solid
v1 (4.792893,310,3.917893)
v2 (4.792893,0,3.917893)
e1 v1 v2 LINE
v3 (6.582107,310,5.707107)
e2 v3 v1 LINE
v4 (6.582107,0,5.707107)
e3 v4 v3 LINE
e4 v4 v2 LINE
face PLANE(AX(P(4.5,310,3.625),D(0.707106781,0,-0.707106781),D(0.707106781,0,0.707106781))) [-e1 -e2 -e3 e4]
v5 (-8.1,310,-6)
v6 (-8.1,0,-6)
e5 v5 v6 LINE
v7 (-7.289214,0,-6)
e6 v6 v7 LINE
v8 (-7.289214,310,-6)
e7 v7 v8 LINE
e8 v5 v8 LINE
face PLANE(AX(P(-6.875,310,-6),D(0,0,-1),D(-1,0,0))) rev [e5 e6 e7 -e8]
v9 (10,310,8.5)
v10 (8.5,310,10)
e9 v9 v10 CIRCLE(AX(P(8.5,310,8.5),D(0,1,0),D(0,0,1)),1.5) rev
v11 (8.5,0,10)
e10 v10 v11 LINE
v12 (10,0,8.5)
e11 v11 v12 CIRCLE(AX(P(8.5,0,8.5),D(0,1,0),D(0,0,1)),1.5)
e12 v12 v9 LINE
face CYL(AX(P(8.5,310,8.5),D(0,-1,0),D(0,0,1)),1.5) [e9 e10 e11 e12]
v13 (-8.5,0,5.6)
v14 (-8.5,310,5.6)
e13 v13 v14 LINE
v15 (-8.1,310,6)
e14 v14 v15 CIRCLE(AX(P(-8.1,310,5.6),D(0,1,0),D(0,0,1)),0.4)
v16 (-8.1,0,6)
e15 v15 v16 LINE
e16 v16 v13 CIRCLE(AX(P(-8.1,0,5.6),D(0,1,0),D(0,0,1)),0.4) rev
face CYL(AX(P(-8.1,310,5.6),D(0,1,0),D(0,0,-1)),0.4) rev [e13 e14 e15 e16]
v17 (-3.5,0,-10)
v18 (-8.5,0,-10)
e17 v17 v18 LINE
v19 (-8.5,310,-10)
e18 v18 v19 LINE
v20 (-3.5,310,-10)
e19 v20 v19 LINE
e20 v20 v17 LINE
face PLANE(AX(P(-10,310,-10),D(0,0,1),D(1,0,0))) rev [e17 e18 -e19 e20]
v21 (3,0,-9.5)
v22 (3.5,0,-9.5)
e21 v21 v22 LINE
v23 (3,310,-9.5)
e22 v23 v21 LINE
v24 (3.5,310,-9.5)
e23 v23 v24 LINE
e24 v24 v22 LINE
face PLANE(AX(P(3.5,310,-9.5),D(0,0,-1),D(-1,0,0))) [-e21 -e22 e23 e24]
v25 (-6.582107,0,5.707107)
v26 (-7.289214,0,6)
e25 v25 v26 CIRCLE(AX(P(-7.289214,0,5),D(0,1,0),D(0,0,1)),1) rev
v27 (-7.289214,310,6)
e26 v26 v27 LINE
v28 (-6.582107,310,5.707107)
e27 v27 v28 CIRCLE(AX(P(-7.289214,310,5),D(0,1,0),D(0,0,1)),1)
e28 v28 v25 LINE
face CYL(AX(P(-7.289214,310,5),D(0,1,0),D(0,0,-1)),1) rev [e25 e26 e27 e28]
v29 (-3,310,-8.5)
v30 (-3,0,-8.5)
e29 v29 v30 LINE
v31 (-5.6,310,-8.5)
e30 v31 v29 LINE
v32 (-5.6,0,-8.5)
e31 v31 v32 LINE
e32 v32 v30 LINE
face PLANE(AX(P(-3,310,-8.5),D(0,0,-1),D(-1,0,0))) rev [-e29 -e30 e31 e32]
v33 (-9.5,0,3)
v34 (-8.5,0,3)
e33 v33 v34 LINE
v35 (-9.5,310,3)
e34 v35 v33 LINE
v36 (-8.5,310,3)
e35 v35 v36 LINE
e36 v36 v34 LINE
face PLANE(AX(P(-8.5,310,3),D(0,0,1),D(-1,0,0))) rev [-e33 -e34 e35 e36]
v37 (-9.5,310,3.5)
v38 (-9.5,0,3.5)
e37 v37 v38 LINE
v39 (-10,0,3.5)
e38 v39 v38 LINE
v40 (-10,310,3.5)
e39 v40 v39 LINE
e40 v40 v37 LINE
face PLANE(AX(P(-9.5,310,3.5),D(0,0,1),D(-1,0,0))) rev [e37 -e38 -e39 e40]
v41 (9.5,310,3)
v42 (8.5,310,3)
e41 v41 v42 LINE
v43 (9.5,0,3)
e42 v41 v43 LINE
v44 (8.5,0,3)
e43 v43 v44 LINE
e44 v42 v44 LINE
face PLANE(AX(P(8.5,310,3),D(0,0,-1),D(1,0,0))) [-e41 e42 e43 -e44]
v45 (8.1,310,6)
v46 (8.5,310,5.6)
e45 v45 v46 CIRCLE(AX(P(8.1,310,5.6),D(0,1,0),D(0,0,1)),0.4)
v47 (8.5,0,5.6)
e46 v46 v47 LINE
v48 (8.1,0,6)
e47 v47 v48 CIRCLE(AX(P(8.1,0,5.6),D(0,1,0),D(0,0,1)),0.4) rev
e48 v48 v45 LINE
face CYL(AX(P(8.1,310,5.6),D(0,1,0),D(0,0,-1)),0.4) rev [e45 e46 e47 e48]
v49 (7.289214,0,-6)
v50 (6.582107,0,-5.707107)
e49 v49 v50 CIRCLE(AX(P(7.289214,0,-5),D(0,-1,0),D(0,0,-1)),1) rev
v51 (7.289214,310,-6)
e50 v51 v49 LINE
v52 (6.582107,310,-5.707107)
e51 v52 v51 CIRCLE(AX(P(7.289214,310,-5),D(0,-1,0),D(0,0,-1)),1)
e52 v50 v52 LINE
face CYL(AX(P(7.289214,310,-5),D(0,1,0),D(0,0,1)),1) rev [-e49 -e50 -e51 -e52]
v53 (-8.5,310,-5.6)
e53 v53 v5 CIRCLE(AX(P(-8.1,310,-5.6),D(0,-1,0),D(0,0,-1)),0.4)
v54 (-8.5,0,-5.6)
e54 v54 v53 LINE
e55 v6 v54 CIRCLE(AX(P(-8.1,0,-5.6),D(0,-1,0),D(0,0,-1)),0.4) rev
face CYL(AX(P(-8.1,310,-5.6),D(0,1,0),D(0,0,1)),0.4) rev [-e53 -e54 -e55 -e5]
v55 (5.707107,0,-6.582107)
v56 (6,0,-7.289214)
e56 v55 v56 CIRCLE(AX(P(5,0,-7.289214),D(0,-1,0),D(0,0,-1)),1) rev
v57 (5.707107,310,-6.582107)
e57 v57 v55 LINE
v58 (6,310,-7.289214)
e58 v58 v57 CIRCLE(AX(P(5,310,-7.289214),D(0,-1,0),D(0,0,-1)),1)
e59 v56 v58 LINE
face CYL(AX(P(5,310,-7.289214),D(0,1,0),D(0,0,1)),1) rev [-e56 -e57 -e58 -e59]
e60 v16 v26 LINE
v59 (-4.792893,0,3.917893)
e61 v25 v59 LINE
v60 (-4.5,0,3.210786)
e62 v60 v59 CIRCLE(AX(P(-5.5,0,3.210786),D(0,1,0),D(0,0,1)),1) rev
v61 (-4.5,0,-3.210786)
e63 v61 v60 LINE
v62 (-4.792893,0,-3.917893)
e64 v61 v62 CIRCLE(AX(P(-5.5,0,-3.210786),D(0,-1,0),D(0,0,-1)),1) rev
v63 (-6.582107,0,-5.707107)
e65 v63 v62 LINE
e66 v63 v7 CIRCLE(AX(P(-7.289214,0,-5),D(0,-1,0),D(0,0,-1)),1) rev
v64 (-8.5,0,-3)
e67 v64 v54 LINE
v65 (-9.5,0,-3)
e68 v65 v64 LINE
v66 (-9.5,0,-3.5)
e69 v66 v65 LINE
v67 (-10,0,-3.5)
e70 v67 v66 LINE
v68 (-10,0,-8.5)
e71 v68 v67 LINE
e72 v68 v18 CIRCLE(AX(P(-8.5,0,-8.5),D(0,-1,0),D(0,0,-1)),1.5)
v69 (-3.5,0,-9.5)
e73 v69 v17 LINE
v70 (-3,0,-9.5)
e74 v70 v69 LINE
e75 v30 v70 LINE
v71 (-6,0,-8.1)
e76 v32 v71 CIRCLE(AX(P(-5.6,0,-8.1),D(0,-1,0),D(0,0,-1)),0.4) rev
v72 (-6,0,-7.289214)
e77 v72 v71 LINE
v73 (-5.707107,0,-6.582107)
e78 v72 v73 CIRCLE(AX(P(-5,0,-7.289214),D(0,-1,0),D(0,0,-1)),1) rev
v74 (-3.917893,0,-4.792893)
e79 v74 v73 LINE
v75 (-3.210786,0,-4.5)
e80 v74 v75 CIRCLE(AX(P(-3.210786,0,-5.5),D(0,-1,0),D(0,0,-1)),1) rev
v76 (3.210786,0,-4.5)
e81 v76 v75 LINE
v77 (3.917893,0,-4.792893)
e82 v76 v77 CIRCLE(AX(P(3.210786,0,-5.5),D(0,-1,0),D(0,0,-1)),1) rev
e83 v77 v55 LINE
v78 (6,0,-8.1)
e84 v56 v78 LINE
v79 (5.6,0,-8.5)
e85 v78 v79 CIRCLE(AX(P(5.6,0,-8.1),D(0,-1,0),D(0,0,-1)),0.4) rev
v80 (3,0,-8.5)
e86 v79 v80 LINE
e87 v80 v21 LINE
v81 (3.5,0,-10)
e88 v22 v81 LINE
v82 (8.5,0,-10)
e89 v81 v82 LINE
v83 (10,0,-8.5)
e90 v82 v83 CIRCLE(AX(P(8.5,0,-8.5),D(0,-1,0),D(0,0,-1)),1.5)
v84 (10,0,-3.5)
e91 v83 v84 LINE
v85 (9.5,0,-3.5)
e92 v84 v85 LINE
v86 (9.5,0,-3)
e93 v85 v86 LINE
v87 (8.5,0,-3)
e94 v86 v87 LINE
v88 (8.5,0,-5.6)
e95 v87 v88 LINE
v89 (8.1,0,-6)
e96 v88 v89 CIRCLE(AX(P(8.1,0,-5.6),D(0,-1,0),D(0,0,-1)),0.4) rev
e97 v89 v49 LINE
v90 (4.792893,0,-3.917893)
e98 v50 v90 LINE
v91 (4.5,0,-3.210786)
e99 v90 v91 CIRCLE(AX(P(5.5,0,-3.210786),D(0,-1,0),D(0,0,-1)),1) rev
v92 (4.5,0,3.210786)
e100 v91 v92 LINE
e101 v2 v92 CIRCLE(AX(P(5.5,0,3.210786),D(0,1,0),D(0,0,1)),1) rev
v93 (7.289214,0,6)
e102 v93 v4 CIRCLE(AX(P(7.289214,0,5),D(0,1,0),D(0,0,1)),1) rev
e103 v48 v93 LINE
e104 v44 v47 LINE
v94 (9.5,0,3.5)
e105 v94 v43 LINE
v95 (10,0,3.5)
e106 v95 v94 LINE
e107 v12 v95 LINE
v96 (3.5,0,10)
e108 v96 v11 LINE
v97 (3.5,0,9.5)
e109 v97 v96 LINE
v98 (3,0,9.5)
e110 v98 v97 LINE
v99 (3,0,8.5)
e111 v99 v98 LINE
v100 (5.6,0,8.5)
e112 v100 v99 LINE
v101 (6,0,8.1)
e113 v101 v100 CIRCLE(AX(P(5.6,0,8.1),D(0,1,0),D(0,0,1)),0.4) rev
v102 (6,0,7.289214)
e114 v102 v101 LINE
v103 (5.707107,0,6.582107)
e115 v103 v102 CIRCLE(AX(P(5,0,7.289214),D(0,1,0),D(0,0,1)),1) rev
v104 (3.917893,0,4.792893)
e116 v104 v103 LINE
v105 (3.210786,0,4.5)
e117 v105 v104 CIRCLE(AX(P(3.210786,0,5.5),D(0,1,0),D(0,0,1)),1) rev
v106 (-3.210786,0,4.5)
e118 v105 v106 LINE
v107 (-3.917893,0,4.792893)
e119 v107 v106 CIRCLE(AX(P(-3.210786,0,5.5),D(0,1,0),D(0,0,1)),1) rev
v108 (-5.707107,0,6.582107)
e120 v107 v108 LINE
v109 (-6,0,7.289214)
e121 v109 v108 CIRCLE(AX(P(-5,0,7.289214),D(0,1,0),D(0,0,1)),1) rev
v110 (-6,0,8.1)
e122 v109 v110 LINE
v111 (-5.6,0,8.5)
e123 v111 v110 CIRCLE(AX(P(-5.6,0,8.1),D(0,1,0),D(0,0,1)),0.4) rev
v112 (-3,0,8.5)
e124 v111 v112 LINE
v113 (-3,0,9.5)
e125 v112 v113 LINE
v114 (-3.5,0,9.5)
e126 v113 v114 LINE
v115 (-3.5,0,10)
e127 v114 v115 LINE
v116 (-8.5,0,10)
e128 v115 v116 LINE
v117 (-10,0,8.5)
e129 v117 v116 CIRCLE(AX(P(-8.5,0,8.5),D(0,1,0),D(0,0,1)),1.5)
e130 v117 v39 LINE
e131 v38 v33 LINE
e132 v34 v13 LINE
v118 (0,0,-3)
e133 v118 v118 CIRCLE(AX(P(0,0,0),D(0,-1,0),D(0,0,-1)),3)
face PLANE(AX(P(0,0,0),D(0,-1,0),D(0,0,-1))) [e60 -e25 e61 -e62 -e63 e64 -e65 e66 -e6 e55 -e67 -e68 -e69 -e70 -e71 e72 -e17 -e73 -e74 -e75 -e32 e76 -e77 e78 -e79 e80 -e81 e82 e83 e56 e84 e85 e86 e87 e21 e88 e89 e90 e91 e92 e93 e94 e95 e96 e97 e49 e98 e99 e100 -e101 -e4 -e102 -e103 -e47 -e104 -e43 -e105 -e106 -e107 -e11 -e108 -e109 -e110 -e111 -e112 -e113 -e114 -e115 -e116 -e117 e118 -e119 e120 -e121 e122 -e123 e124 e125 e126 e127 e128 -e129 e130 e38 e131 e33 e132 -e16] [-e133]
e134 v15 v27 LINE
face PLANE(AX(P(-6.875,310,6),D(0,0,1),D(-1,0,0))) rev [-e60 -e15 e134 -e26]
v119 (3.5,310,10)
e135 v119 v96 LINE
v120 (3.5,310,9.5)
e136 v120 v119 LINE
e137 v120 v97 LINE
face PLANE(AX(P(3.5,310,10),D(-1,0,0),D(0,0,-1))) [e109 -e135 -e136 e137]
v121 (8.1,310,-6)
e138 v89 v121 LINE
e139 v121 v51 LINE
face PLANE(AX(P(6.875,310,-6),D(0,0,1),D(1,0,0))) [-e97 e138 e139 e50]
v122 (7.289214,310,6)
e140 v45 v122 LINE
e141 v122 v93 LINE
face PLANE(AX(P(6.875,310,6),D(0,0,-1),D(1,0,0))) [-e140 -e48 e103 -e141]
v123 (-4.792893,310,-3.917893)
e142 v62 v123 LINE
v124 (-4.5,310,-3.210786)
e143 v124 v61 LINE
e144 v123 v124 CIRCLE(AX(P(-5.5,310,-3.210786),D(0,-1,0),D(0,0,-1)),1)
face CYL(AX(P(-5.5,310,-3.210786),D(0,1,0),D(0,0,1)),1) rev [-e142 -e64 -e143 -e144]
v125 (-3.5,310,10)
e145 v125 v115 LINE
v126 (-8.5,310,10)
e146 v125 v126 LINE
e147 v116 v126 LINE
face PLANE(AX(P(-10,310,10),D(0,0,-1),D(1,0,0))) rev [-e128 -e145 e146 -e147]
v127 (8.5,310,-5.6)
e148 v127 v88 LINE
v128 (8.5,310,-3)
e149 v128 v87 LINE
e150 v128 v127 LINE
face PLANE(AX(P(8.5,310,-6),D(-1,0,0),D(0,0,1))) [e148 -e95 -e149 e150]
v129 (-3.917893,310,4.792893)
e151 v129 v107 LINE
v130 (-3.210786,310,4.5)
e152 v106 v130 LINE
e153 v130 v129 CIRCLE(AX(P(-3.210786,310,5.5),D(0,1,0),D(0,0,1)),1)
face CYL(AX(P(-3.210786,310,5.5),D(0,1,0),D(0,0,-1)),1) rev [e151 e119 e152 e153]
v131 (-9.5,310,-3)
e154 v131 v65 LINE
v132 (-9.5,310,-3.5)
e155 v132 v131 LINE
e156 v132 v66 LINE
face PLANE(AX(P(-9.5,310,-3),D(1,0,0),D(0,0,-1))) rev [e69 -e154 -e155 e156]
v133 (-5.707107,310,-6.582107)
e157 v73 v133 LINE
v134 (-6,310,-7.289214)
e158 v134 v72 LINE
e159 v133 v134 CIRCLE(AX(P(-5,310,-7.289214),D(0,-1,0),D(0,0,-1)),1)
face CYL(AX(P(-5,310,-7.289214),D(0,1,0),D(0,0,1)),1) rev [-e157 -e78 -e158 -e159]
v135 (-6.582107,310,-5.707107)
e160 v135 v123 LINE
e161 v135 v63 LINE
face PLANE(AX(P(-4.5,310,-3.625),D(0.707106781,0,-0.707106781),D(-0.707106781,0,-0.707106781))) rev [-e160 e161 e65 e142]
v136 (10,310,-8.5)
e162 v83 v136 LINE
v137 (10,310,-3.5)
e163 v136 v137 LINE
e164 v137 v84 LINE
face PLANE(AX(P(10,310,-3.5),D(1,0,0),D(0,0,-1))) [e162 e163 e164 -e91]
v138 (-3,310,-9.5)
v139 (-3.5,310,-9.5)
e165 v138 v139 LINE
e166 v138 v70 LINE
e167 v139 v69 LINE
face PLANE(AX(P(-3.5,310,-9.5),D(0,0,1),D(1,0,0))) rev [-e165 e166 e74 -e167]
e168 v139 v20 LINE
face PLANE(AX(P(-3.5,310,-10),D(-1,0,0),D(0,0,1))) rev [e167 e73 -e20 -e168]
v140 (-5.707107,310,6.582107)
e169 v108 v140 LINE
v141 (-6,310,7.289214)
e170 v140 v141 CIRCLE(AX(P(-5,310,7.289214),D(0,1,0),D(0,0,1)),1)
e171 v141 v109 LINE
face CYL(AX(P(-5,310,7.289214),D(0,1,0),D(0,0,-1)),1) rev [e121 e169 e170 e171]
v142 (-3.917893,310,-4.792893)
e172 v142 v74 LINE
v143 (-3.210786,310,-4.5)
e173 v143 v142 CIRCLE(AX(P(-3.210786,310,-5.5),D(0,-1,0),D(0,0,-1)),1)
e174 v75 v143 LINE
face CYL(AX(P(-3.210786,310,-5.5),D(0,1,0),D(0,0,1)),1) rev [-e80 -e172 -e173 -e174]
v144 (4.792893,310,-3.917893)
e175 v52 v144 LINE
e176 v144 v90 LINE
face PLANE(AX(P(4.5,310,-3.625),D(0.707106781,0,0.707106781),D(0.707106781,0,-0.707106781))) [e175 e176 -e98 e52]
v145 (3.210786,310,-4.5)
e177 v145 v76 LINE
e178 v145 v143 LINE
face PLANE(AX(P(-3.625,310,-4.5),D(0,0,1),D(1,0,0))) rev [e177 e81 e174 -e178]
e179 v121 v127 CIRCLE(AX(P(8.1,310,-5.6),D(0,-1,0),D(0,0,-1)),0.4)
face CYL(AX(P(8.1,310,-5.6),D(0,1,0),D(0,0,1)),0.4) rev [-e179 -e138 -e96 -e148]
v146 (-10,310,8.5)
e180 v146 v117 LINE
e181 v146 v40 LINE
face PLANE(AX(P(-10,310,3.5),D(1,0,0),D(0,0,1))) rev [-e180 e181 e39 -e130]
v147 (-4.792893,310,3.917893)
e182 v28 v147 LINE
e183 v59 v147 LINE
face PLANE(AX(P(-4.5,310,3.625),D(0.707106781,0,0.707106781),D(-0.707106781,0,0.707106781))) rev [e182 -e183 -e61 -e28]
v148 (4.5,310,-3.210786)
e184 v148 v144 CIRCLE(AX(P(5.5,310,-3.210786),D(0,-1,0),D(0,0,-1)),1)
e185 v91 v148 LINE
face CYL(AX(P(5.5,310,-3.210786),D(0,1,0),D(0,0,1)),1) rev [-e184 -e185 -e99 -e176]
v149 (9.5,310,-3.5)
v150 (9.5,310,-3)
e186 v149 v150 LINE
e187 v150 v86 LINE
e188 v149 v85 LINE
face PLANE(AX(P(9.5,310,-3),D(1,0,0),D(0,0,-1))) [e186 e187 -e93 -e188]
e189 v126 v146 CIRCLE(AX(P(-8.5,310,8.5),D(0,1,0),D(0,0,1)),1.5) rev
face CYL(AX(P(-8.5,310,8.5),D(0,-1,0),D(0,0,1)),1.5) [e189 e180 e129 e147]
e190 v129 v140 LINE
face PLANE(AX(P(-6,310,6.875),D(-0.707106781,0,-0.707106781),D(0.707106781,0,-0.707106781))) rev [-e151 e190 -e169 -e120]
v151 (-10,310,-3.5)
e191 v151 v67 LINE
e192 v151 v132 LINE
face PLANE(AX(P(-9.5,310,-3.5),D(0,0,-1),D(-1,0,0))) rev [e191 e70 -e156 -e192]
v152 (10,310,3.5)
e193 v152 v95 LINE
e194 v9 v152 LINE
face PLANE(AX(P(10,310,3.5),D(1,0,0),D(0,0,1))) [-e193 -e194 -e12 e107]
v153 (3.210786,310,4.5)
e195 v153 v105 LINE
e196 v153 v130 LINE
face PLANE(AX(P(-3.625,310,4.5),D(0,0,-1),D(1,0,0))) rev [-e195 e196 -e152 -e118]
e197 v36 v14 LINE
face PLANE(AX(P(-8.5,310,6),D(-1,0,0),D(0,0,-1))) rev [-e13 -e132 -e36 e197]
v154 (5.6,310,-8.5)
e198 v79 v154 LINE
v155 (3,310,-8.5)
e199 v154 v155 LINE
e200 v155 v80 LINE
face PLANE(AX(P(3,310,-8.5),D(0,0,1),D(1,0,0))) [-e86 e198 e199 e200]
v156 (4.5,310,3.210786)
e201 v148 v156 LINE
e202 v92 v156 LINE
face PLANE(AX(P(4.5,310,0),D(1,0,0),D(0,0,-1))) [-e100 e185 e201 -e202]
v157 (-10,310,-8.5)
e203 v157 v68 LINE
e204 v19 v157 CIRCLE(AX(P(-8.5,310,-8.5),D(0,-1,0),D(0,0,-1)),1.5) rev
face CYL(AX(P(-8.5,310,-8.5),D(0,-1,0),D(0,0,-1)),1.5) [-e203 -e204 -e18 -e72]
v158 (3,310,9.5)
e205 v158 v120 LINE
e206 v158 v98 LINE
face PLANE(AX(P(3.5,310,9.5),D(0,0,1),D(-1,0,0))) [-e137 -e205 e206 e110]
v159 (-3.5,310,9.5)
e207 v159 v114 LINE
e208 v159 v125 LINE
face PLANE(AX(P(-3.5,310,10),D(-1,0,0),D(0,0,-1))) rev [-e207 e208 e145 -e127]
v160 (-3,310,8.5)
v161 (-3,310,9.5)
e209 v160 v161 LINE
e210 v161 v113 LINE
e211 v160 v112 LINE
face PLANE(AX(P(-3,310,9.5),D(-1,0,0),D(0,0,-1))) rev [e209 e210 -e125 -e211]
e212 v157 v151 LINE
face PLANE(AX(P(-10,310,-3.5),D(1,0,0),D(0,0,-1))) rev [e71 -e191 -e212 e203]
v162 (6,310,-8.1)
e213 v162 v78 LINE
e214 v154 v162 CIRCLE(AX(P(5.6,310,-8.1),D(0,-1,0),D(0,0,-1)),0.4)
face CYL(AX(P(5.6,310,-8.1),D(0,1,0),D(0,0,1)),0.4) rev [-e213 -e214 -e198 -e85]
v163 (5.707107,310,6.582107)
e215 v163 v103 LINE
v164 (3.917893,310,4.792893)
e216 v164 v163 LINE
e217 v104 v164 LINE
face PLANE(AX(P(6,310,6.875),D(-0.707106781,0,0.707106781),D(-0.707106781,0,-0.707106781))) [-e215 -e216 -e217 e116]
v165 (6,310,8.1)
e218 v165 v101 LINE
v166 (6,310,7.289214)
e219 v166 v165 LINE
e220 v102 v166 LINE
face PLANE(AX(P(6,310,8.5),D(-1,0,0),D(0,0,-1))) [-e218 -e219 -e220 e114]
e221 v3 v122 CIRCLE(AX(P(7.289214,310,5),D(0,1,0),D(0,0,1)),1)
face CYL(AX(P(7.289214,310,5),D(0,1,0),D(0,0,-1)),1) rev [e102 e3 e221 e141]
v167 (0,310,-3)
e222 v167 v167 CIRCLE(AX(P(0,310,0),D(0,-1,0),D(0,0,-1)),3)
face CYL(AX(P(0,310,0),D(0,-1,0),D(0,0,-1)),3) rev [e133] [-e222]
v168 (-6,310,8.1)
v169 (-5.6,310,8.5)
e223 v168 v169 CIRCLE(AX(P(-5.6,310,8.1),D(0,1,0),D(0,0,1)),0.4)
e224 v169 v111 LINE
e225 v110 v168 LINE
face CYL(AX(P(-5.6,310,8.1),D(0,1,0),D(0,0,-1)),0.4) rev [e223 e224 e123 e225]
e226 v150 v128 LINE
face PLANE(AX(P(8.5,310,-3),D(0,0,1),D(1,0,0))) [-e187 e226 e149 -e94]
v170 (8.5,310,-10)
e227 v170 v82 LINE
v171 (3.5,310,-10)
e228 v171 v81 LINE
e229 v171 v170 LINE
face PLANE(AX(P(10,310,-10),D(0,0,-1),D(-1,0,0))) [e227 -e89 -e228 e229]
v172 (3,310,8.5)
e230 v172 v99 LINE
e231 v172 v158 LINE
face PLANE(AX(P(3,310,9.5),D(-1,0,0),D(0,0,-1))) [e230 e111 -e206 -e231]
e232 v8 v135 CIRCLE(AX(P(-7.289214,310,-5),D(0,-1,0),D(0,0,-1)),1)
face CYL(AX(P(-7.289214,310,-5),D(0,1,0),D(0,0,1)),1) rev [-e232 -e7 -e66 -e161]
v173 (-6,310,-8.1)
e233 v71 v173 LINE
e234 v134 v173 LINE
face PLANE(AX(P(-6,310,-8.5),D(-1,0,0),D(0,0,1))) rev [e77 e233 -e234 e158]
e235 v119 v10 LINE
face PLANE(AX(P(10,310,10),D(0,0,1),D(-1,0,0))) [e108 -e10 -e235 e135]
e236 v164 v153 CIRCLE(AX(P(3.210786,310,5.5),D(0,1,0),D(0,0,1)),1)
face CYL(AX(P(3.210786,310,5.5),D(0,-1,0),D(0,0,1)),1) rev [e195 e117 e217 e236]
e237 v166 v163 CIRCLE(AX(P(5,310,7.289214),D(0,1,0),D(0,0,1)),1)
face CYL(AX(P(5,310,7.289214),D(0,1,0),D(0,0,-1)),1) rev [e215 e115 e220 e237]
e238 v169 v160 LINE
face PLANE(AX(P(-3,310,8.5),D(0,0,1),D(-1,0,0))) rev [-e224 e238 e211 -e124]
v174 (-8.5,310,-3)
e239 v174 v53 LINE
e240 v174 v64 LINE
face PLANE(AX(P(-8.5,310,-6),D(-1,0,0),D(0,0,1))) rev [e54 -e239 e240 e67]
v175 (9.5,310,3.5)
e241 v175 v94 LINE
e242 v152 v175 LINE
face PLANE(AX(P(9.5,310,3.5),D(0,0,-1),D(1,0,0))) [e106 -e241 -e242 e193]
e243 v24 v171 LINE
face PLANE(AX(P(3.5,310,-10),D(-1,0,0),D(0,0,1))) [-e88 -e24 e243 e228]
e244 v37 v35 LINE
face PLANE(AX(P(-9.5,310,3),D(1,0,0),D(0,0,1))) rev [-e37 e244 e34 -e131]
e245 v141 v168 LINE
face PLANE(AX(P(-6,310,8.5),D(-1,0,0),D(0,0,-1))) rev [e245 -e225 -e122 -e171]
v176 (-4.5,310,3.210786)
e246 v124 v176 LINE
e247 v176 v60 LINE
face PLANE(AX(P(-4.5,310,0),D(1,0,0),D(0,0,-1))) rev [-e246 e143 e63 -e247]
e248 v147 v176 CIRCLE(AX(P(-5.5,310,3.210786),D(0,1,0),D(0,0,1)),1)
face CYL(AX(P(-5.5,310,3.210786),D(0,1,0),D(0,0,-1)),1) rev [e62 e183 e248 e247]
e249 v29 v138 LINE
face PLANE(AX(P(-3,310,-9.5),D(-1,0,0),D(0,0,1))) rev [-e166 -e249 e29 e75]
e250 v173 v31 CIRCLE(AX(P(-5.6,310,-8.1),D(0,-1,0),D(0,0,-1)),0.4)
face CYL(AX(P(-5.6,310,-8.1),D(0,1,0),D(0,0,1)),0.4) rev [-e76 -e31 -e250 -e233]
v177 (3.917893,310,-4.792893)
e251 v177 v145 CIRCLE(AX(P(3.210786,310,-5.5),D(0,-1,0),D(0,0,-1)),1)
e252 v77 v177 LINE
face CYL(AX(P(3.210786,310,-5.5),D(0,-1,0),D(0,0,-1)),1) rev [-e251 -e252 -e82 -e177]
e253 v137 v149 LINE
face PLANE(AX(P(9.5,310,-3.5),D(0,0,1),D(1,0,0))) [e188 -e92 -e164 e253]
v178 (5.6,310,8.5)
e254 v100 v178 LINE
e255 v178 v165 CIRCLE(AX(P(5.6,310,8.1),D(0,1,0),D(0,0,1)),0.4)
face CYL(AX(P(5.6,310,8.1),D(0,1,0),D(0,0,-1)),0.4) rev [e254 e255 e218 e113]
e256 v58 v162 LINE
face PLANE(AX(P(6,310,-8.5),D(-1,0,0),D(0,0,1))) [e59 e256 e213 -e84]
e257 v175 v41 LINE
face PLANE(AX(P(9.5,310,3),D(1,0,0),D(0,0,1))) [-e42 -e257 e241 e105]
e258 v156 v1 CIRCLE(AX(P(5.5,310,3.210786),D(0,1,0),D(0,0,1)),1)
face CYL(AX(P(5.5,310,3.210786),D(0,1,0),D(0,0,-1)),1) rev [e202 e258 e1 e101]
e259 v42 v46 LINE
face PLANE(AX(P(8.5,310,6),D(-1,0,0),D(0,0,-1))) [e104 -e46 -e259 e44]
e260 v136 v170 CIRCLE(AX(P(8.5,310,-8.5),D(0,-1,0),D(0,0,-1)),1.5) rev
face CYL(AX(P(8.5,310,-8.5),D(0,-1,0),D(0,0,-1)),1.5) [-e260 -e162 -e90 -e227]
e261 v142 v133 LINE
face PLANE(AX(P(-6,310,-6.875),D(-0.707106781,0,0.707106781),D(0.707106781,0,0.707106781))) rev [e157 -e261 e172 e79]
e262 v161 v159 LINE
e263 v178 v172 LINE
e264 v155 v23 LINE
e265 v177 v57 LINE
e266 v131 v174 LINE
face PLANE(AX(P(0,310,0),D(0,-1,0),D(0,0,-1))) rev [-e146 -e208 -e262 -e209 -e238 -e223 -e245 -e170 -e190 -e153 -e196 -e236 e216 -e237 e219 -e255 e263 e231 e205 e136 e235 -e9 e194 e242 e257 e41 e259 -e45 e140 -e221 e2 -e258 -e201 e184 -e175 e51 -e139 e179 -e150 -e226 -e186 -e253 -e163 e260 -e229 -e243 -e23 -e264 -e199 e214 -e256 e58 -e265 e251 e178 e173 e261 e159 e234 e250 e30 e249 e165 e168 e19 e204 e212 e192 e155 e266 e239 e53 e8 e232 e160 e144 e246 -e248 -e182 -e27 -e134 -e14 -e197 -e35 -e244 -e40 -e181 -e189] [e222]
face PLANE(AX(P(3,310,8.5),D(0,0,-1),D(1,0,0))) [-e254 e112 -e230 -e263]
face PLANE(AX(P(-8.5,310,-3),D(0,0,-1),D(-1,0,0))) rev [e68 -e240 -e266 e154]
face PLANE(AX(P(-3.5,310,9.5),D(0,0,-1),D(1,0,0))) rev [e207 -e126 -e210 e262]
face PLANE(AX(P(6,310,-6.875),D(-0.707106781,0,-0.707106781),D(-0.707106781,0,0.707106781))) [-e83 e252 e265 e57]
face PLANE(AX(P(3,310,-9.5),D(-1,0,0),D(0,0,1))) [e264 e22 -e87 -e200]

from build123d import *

# Parameters (mm, degrees)
BOSS_EXTRU_1_CORPS_DEPTH    = 310
CONG_1_R                    = 1.5
CONG_2_R                    = 0.4
CONG_4_R                    = 1
CONG_1_OF_SYM_TRIE_BRAS_R   = 1.5
CONG_2_OF_SYM_TRIE_BRAS_R   = 0.4
CONG_4_OF_SYM_TRIE_BRAS_R   = 1
SYM_TRIE_BRAS_DOUBLE_DEPTH  = 310
APR_S_TARODAGE_M6_R         = 3
ENL_V_MAT_FILETAGE_M6_DEPTH = 311.322412984


# Read off the part's stored shape, not the designer's step: Symétrie Bras double
with BuildPart() as part:
    # Esquisse4 → Boss.-Extru.1 Corps (new body)
    with BuildSketch(Plane(origin=(0, 0, 0), x_dir=(1, 0, 0), z_dir=(0, 1, 0))):
        Polygon((0, 0), (-4.5, 0), (-4.5, 3.625), (-6.875, 6), (-8.5, 6), (-8.5, 3), (-9.5, 3), (-9.5, 3.5), (-10, 3.5), (-10, 10), (-3.5, 10), (-3.5, 9.5), (-3, 9.5), (-3, 8.5), (-6, 8.5), (-6, 6.875), (-3.625, 4.5), (0, 4.5), align=None)
    boss_extru_1_corps = extrude(amount=BOSS_EXTRU_1_CORPS_DEPTH)

    # Congé1
    cong_1_edges = [part.edges().sort_by_distance(p)[0] for p in [
        (-10, 155, -10),
    ]]
    fillet(cong_1_edges, radius=CONG_1_R)

    # Congé2
    cong_2_edges = [part.edges().sort_by_distance(p)[0] for p in [
        (-8.5, 155, -6),
        (-6, 155, -8.5),
    ]]
    fillet(cong_2_edges, radius=CONG_2_R)

    # Congé4
    cong_4_edges = [part.edges().sort_by_distance(p)[0] for p in [
        (-4.5, 155, -3.625),
        (-6.875, 155, -6),
        (-6, 155, -6.875),
        (-3.625, 155, -4.5),
    ]]
    fillet(cong_4_edges, radius=CONG_4_R)

    # Symétrie Bras: Boss.-Extru.1 Corps across plane
    add(boss_extru_1_corps.mirror(Plane(origin=(0, 310, -4.5), x_dir=(0, 0, 1), z_dir=(-1, 0, 0))))

    # Congé1 of Symétrie Bras
    cong_1_of_sym_trie_bras_edges = [part.edges().sort_by_distance(p)[0] for p in [
        (10, 155, -10),
    ]]
    fillet(cong_1_of_sym_trie_bras_edges, radius=CONG_1_OF_SYM_TRIE_BRAS_R)

    # Congé2 of Symétrie Bras
    cong_2_of_sym_trie_bras_edges = [part.edges().sort_by_distance(p)[0] for p in [
        (8.5, 155, -6),
        (6, 155, -8.5),
    ]]
    fillet(cong_2_of_sym_trie_bras_edges, radius=CONG_2_OF_SYM_TRIE_BRAS_R)

    # Congé4 of Symétrie Bras
    cong_4_of_sym_trie_bras_edges = [part.edges().sort_by_distance(p)[0] for p in [
        (4.5, 155, -3.625),
        (6.875, 155, -6),
        (6, 155, -6.875),
        (3.625, 155, -4.5),
    ]]
    fillet(cong_4_of_sym_trie_bras_edges, radius=CONG_4_OF_SYM_TRIE_BRAS_R)

    # Symétrie Bras double outline → Symétrie Bras double (add)
    with BuildSketch(Plane(origin=(0, 0, 0), x_dir=(1, 0, 0), z_dir=(0, 1, 0))):
        with BuildLine():
            ThreePointArc((7.289213562, -6), (6.90653013, -5.923879533), (6.582106781, -5.707106781))
            Line((6.582106781, -5.707106781), (4.792893219, -3.917893219))
            ThreePointArc((4.792893219, -3.917893219), (4.576120467, -3.59346987), (4.5, -3.210786438))
            Line((4.5, -3.210786438), (4.5, 0))
            Line((4.5, 0), (-4.5, 0))
            Line((-4.5, 0), (-4.5, -3.210786438))
            ThreePointArc((-4.5, -3.210786438), (-4.576120467, -3.59346987), (-4.792893219, -3.917893219))
            Line((-4.792893219, -3.917893219), (-6.582106781, -5.707106781))
            ThreePointArc((-6.582106781, -5.707106781), (-6.90653013, -5.923879533), (-7.289213562, -6))
            Line((-7.289213562, -6), (-8.1, -6))
            ThreePointArc((-8.1, -6), (-8.382842712, -5.882842712), (-8.5, -5.6))
            Line((-8.5, -5.6), (-8.5, -3))
            Line((-8.5, -3), (-9.5, -3))
            Line((-9.5, -3), (-9.5, -3.5))
            Line((-9.5, -3.5), (-10, -3.5))
            Line((-10, -3.5), (-10, -8.5))
            ThreePointArc((-10, -8.5), (-9.560660172, -9.560660172), (-8.5, -10))
            Line((-8.5, -10), (-3.5, -10))
            Line((-3.5, -10), (-3.5, -9.5))
            Line((-3.5, -9.5), (-3, -9.5))
            Line((-3, -9.5), (-3, -8.5))
            Line((-3, -8.5), (-5.6, -8.5))
            ThreePointArc((-5.6, -8.5), (-5.882842712, -8.382842712), (-6, -8.1))
            Line((-6, -8.1), (-6, -7.289213562))
            ThreePointArc((-6, -7.289213562), (-5.923879533, -6.90653013), (-5.707106781, -6.582106781))
            Line((-5.707106781, -6.582106781), (-3.917893219, -4.792893219))
            ThreePointArc((-3.917893219, -4.792893219), (-3.59346987, -4.576120467), (-3.210786438, -4.5))
            Line((-3.210786438, -4.5), (3.210786438, -4.5))
            ThreePointArc((3.210786438, -4.5), (3.59346987, -4.576120467), (3.917893219, -4.792893219))
            Line((3.917893219, -4.792893219), (5.707106781, -6.582106781))
            ThreePointArc((5.707106781, -6.582106781), (5.923879533, -6.90653013), (6, -7.289213562))
            Line((6, -7.289213562), (6, -8.1))
            ThreePointArc((6, -8.1), (5.882842712, -8.382842712), (5.6, -8.5))
            Line((5.6, -8.5), (3, -8.5))
            Line((3, -8.5), (3, -9.5))
            Line((3, -9.5), (3.5, -9.5))
            Line((3.5, -9.5), (3.5, -10))
            Line((3.5, -10), (8.5, -10))
            ThreePointArc((8.5, -10), (9.560660172, -9.560660172), (10, -8.5))
            Line((10, -8.5), (10, -3.5))
            Line((10, -3.5), (9.5, -3.5))
            Line((9.5, -3.5), (9.5, -3))
            Line((9.5, -3), (8.5, -3))
            Line((8.5, -3), (8.5, -5.6))
            ThreePointArc((8.5, -5.6), (8.382842712, -5.882842712), (8.1, -6))
            Line((8.1, -6), (7.289213562, -6))
        make_face()
    extrude(amount=SYM_TRIE_BRAS_DOUBLE_DEPTH)

    # Après tarodage M6 → Enlèv. mat.-Filetage M6 (cut, through all)
    with BuildSketch(Plane.XZ):
        with Locations(Location((0, 0, 0), (0, 0, 270))):
            Circle(APR_S_TARODAGE_M6_R)
    extrude(amount=-ENL_V_MAT_FILETAGE_M6_DEPTH, mode=Mode.SUBTRACT)


solid = part.part
